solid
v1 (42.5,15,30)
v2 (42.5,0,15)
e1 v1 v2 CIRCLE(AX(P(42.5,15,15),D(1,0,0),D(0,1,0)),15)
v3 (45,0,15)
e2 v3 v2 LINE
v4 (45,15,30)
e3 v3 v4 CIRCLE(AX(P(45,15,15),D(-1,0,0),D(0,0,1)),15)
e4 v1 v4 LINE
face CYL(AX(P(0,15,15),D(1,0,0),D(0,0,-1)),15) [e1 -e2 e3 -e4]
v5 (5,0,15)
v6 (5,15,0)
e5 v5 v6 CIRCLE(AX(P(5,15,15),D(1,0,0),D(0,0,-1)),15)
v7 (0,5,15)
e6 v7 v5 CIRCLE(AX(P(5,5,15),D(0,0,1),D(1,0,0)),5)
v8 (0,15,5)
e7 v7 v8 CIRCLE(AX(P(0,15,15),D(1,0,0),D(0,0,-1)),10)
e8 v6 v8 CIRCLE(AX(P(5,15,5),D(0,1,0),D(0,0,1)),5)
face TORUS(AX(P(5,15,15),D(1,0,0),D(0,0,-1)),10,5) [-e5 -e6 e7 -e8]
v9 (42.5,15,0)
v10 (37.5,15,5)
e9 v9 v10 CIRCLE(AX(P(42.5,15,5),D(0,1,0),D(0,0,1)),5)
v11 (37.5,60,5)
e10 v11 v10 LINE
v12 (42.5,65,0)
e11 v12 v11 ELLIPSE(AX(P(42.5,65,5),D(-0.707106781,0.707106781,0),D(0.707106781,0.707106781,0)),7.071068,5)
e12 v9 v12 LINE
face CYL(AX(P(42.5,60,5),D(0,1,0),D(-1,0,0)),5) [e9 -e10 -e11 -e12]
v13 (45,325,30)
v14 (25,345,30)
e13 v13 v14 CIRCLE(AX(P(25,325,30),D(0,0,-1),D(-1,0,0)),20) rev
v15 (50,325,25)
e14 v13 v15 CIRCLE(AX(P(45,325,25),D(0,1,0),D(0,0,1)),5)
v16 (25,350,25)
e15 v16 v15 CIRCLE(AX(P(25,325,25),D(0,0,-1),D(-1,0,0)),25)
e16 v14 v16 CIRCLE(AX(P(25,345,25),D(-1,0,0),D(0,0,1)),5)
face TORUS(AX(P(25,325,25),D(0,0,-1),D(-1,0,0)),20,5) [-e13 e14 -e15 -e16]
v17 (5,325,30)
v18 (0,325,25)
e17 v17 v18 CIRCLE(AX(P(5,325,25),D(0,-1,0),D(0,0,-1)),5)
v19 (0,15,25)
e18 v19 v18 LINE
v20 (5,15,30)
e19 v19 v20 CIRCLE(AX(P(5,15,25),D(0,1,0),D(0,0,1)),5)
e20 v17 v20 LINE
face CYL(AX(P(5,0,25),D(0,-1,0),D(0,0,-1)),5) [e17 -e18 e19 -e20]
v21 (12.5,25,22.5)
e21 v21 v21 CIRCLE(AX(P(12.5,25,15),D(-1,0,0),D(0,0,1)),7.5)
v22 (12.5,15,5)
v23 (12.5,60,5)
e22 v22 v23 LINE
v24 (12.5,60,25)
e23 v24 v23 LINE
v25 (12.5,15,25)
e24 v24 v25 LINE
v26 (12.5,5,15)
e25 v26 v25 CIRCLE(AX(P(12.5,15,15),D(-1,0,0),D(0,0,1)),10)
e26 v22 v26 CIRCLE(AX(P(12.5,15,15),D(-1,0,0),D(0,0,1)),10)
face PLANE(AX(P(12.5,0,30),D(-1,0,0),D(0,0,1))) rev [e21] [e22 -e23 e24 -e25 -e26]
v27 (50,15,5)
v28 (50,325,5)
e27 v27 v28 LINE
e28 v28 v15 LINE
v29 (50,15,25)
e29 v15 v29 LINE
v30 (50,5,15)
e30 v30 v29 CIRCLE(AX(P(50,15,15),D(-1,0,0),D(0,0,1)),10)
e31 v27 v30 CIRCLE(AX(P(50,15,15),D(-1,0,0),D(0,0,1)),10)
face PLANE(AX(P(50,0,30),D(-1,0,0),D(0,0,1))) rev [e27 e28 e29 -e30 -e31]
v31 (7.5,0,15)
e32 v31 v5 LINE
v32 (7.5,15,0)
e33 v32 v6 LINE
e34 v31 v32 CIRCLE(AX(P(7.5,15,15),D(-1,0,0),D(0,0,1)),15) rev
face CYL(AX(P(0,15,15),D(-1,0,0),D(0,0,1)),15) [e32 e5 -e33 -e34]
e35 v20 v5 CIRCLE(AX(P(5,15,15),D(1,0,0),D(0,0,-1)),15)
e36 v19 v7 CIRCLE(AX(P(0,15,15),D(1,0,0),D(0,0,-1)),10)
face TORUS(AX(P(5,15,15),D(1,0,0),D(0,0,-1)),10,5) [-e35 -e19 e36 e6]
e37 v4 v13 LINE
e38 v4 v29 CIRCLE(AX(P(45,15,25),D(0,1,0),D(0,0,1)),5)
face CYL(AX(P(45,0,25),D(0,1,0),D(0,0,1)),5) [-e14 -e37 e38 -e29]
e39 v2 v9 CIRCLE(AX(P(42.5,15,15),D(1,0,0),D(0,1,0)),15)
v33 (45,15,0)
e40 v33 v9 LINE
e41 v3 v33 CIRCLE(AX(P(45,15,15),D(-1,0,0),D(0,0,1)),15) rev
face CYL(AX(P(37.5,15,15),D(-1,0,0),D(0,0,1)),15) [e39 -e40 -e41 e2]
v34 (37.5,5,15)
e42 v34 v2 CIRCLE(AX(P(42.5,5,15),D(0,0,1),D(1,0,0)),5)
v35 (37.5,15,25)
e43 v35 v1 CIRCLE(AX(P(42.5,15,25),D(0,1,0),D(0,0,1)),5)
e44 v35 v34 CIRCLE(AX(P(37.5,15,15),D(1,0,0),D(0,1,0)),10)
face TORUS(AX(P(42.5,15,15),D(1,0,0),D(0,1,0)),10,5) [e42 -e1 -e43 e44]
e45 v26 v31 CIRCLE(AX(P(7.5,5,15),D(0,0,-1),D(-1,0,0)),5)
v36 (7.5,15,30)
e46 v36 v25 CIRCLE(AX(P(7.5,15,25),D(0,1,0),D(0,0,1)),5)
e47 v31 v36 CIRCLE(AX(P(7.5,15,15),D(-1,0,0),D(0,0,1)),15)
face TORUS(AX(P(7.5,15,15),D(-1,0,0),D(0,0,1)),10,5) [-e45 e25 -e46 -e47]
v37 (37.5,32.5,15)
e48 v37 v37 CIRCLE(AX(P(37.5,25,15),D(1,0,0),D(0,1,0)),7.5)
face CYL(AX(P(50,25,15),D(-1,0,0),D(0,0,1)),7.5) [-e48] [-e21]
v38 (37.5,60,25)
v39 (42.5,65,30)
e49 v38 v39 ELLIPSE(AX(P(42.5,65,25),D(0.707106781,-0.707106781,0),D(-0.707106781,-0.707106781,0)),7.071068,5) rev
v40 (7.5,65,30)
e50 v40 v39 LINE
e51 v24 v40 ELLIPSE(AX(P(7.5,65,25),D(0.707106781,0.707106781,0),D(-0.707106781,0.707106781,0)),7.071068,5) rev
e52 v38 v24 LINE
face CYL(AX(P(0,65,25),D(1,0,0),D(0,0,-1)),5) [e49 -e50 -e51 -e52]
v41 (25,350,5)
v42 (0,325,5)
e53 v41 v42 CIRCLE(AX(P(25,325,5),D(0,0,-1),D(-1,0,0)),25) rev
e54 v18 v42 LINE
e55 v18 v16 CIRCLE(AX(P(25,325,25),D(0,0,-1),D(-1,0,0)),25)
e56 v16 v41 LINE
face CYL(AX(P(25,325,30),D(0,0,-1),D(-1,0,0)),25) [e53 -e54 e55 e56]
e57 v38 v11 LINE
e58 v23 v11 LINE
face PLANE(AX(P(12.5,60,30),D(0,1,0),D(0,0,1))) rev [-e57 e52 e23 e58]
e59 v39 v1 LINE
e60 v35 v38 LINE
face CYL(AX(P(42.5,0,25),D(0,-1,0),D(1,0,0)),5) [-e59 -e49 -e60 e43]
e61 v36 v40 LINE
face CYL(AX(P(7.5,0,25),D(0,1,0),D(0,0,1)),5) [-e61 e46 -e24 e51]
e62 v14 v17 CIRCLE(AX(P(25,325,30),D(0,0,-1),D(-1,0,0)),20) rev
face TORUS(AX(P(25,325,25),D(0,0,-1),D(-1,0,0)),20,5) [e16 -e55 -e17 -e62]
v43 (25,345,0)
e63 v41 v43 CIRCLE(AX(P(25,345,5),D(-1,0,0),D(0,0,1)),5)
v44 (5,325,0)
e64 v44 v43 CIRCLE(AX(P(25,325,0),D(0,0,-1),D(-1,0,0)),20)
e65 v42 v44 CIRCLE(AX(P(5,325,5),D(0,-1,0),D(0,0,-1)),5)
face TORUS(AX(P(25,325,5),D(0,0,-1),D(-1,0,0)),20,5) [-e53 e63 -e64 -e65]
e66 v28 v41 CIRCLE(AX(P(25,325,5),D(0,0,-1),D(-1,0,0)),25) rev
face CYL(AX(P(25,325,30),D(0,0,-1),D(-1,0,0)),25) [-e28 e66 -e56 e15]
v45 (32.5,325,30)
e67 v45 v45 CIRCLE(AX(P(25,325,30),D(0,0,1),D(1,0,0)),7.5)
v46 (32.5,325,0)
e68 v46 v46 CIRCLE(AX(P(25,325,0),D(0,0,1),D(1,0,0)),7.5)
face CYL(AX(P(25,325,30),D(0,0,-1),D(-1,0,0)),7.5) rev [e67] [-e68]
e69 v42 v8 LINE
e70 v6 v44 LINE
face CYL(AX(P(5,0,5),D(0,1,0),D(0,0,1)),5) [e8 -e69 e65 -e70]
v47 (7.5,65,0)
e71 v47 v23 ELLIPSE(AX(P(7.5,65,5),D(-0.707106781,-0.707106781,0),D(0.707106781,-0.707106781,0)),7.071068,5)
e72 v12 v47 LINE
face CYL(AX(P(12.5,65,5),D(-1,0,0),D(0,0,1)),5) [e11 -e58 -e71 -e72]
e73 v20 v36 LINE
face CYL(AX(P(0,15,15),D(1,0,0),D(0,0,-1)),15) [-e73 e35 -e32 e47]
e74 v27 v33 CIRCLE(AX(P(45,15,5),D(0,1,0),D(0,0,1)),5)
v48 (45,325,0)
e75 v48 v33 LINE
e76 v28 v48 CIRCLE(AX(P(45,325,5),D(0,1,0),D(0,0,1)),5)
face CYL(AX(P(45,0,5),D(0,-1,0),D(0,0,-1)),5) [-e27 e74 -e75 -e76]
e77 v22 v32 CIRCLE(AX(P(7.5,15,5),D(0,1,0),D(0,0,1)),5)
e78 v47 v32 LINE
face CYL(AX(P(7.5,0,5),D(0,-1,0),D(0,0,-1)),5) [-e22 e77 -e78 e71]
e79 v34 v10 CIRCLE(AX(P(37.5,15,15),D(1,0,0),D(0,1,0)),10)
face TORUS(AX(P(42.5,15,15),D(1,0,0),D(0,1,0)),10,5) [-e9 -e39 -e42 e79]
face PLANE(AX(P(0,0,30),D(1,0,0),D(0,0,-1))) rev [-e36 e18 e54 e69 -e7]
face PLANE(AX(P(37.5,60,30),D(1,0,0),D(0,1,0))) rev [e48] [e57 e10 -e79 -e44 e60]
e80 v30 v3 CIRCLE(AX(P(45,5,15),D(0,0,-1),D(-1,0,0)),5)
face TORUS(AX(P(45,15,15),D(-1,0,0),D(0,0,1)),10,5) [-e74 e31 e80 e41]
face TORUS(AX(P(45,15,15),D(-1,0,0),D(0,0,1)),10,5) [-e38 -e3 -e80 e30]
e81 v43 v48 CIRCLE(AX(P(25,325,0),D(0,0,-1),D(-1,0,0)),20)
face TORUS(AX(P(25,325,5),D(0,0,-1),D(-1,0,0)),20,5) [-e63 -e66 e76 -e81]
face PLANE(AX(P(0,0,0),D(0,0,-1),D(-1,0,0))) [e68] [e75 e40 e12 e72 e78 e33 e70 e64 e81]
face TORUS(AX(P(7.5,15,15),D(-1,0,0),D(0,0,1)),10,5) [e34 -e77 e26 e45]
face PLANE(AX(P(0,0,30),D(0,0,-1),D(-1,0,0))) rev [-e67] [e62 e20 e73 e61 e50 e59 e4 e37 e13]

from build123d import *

# Parameters (mm, degrees)
CROQUIS1_R              = 7.5
SALIENTE_EXTRUIR2_DEPTH = 30
REDONDEO1_R             = 25
CROQUIS2_R              = 7.5
SALIENTE_EXTRUIR3_DEPTH = 50
REDONDEO2_R             = 5
REDONDEO4_R             = 15


# Some blends are built 0.0001 mm under size
with BuildPart() as part:
    # Croquis1 → Saliente-Extruir2 (new body)
    with BuildSketch(Plane.XY):
        Polygon((12.5, 0), (12.5, 60), (37.5, 60), (37.5, 0), (50, 0), (50, 350), (0, 350), (0, 0), align=None)
        with Locations((25, 325)):
            Circle(CROQUIS1_R, mode=Mode.SUBTRACT)
    extrude(amount=SALIENTE_EXTRUIR2_DEPTH)

    # Redondeo1
    redondeo1_edges = [part.edges().sort_by_distance(p)[0] for p in [
        (0, 350, 15),
        (50, 350, 15),
    ]]
    fillet(redondeo1_edges, radius=REDONDEO1_R - 0.0001)  # a hair under: the kernel refuses the full size

    # Croquis2 → Saliente-Extruir3 (add)
    with BuildSketch(Plane.ZY):
        with Locations((15, 25)):
            Circle(CROQUIS2_R)
    extrude(amount=-SALIENTE_EXTRUIR3_DEPTH)

    # Redondeo2
    redondeo2_edges = [part.edges().sort_by_distance(p)[0] for p in [
        (12.5, 30, 30),
        (25, 60, 30),
        (50, 0, 15),
        (37.5, 0, 15),
        (12.5, 0, 15),
        (0, 0, 15),
        (37.5, 30, 30),
        (50, 162.50005, 30),
        (0, 162.50005, 0),
        (0, 162.50005, 30),
        (42.677698819, 342.677698819, 0),
        (7.322301181, 342.677698819, 0),
        (42.677698819, 342.677698819, 30),
        (7.322301181, 342.677698819, 30),
        (50, 162.50005, 0),
        (37.5, 30, 0),
        (25, 60, 0),
        (12.5, 30, 0),
    ]]
    fillet(redondeo2_edges, radius=REDONDEO2_R)

    # Redondeo4
    # the kernel refuses this fillet: 15 mm, written as the material it takes off along each edge
    with BuildSketch(Plane(origin=(50, 15, 15), x_dir=(0, -1, 0), z_dir=(0, 0, 1))) as redondeo4_piece_1:
        with BuildLine():
            CenterArc((10, -5), 5, 0, 90)
            Line((15, -5), (15, 0))
            Line((15, 0), (10, 0))
        make_face()
    revolve(axis=Axis((50, 15, 15), (1, 0, 0)), revolution_arc=90, mode=Mode.SUBTRACT)
    with BuildSketch(Plane(origin=(37.5, 15, 15), x_dir=(0, 0, -1), z_dir=(0, 1, 0))) as redondeo4_piece_2:
        with BuildLine():
            CenterArc((10, -5), 5, 0, 90)
            Line((15, -5), (15, 0))
            Line((15, 0), (10, 0))
        make_face()
    revolve(axis=Axis((37.5, 15, 15), (-1, 0, 0)), revolution_arc=90, mode=Mode.SUBTRACT)
    with BuildSketch(Plane(origin=(12.5, 15, 15), x_dir=(0, -1, 0), z_dir=(0, 0, 1))) as redondeo4_piece_3:
        with BuildLine():
            CenterArc((10, -5), 5, 0, 90)
            Line((15, -5), (15, 0))
            Line((15, 0), (10, 0))
        make_face()
    revolve(axis=Axis((12.5, 15, 15), (1, 0, 0)), revolution_arc=90, mode=Mode.SUBTRACT)
    with BuildSketch(Plane(origin=(0, 15, 15), x_dir=(0, 0, -1), z_dir=(0, 1, 0))) as redondeo4_piece_4:
        with BuildLine():
            CenterArc((10, -5), 5, 0, 90)
            Line((15, -5), (15, 0))
            Line((15, 0), (10, 0))
        make_face()
    revolve(axis=Axis((0, 15, 15), (-1, 0, 0)), revolution_arc=90, mode=Mode.SUBTRACT)
    with BuildSketch(Plane(origin=(12.5, 15, 15), x_dir=(0, 0, 1), z_dir=(0, 1, 0))) as redondeo4_piece_5:
        with BuildLine():
            CenterArc((10, -5), 5, 0, 90)
            Line((15, -5), (15, 0))
            Line((15, 0), (10, 0))
        make_face()
    revolve(axis=Axis((12.5, 15, 15), (1, 0, 0)), revolution_arc=90, mode=Mode.SUBTRACT)
    with BuildSketch(Plane(origin=(0, 15, 15), x_dir=(0, -1, 0), z_dir=(0, 0, -1))) as redondeo4_piece_6:
        with BuildLine():
            CenterArc((10, -5), 5, 0, 90)
            Line((15, -5), (15, 0))
            Line((15, 0), (10, 0))
        make_face()
    revolve(axis=Axis((0, 15, 15), (-1, 0, 0)), revolution_arc=90, mode=Mode.SUBTRACT)
    with BuildSketch(Plane(origin=(50, 15, 15), x_dir=(0, 0, 1), z_dir=(0, 1, 0))) as redondeo4_piece_7:
        with BuildLine():
            CenterArc((10, -5), 5, 0, 90)
            Line((15, -5), (15, 0))
            Line((15, 0), (10, 0))
        make_face()
    revolve(axis=Axis((50, 15, 15), (1, 0, 0)), revolution_arc=90, mode=Mode.SUBTRACT)
    with BuildSketch(Plane(origin=(37.5, 15, 15), x_dir=(0, -1, 0), z_dir=(0, 0, -1))) as redondeo4_piece_8:
        with BuildLine():
            CenterArc((10, -5), 5, 0, 90)
            Line((15, -5), (15, 0))
            Line((15, 0), (10, 0))
        make_face()
    revolve(axis=Axis((37.5, 15, 15), (-1, 0, 0)), revolution_arc=90, mode=Mode.SUBTRACT)
    with BuildSketch(Plane(origin=(37.5, 0, 30), x_dir=(0, 1, 0), z_dir=(1, 0, 0)), Plane(origin=(0, 0, 30), x_dir=(0, 1, 0), z_dir=(1, 0, 0))) as redondeo4_piece_9:
        with BuildLine():
            CenterArc((REDONDEO4_R, -REDONDEO4_R), REDONDEO4_R, 90, 90)
            Line((0, -REDONDEO4_R), (0, 0))
            Line((0, 0), (REDONDEO4_R, 0))
        make_face()
    extrude(amount=12.5, mode=Mode.SUBTRACT)
    with BuildSketch(Plane(origin=(0, 0, 0), x_dir=(0, 1, 0), z_dir=(1, 0, 0)), Plane(origin=(37.5, 0, 0), x_dir=(0, 1, 0), z_dir=(1, 0, 0))) as redondeo4_piece_10:
        with BuildLine():
            CenterArc((REDONDEO4_R, REDONDEO4_R), REDONDEO4_R, 180, 90)
            Line((0, REDONDEO4_R), (0, 0))
            Line((0, 0), (REDONDEO4_R, 0))
        make_face()
    extrude(amount=12.5, mode=Mode.SUBTRACT)


solid = part.part
